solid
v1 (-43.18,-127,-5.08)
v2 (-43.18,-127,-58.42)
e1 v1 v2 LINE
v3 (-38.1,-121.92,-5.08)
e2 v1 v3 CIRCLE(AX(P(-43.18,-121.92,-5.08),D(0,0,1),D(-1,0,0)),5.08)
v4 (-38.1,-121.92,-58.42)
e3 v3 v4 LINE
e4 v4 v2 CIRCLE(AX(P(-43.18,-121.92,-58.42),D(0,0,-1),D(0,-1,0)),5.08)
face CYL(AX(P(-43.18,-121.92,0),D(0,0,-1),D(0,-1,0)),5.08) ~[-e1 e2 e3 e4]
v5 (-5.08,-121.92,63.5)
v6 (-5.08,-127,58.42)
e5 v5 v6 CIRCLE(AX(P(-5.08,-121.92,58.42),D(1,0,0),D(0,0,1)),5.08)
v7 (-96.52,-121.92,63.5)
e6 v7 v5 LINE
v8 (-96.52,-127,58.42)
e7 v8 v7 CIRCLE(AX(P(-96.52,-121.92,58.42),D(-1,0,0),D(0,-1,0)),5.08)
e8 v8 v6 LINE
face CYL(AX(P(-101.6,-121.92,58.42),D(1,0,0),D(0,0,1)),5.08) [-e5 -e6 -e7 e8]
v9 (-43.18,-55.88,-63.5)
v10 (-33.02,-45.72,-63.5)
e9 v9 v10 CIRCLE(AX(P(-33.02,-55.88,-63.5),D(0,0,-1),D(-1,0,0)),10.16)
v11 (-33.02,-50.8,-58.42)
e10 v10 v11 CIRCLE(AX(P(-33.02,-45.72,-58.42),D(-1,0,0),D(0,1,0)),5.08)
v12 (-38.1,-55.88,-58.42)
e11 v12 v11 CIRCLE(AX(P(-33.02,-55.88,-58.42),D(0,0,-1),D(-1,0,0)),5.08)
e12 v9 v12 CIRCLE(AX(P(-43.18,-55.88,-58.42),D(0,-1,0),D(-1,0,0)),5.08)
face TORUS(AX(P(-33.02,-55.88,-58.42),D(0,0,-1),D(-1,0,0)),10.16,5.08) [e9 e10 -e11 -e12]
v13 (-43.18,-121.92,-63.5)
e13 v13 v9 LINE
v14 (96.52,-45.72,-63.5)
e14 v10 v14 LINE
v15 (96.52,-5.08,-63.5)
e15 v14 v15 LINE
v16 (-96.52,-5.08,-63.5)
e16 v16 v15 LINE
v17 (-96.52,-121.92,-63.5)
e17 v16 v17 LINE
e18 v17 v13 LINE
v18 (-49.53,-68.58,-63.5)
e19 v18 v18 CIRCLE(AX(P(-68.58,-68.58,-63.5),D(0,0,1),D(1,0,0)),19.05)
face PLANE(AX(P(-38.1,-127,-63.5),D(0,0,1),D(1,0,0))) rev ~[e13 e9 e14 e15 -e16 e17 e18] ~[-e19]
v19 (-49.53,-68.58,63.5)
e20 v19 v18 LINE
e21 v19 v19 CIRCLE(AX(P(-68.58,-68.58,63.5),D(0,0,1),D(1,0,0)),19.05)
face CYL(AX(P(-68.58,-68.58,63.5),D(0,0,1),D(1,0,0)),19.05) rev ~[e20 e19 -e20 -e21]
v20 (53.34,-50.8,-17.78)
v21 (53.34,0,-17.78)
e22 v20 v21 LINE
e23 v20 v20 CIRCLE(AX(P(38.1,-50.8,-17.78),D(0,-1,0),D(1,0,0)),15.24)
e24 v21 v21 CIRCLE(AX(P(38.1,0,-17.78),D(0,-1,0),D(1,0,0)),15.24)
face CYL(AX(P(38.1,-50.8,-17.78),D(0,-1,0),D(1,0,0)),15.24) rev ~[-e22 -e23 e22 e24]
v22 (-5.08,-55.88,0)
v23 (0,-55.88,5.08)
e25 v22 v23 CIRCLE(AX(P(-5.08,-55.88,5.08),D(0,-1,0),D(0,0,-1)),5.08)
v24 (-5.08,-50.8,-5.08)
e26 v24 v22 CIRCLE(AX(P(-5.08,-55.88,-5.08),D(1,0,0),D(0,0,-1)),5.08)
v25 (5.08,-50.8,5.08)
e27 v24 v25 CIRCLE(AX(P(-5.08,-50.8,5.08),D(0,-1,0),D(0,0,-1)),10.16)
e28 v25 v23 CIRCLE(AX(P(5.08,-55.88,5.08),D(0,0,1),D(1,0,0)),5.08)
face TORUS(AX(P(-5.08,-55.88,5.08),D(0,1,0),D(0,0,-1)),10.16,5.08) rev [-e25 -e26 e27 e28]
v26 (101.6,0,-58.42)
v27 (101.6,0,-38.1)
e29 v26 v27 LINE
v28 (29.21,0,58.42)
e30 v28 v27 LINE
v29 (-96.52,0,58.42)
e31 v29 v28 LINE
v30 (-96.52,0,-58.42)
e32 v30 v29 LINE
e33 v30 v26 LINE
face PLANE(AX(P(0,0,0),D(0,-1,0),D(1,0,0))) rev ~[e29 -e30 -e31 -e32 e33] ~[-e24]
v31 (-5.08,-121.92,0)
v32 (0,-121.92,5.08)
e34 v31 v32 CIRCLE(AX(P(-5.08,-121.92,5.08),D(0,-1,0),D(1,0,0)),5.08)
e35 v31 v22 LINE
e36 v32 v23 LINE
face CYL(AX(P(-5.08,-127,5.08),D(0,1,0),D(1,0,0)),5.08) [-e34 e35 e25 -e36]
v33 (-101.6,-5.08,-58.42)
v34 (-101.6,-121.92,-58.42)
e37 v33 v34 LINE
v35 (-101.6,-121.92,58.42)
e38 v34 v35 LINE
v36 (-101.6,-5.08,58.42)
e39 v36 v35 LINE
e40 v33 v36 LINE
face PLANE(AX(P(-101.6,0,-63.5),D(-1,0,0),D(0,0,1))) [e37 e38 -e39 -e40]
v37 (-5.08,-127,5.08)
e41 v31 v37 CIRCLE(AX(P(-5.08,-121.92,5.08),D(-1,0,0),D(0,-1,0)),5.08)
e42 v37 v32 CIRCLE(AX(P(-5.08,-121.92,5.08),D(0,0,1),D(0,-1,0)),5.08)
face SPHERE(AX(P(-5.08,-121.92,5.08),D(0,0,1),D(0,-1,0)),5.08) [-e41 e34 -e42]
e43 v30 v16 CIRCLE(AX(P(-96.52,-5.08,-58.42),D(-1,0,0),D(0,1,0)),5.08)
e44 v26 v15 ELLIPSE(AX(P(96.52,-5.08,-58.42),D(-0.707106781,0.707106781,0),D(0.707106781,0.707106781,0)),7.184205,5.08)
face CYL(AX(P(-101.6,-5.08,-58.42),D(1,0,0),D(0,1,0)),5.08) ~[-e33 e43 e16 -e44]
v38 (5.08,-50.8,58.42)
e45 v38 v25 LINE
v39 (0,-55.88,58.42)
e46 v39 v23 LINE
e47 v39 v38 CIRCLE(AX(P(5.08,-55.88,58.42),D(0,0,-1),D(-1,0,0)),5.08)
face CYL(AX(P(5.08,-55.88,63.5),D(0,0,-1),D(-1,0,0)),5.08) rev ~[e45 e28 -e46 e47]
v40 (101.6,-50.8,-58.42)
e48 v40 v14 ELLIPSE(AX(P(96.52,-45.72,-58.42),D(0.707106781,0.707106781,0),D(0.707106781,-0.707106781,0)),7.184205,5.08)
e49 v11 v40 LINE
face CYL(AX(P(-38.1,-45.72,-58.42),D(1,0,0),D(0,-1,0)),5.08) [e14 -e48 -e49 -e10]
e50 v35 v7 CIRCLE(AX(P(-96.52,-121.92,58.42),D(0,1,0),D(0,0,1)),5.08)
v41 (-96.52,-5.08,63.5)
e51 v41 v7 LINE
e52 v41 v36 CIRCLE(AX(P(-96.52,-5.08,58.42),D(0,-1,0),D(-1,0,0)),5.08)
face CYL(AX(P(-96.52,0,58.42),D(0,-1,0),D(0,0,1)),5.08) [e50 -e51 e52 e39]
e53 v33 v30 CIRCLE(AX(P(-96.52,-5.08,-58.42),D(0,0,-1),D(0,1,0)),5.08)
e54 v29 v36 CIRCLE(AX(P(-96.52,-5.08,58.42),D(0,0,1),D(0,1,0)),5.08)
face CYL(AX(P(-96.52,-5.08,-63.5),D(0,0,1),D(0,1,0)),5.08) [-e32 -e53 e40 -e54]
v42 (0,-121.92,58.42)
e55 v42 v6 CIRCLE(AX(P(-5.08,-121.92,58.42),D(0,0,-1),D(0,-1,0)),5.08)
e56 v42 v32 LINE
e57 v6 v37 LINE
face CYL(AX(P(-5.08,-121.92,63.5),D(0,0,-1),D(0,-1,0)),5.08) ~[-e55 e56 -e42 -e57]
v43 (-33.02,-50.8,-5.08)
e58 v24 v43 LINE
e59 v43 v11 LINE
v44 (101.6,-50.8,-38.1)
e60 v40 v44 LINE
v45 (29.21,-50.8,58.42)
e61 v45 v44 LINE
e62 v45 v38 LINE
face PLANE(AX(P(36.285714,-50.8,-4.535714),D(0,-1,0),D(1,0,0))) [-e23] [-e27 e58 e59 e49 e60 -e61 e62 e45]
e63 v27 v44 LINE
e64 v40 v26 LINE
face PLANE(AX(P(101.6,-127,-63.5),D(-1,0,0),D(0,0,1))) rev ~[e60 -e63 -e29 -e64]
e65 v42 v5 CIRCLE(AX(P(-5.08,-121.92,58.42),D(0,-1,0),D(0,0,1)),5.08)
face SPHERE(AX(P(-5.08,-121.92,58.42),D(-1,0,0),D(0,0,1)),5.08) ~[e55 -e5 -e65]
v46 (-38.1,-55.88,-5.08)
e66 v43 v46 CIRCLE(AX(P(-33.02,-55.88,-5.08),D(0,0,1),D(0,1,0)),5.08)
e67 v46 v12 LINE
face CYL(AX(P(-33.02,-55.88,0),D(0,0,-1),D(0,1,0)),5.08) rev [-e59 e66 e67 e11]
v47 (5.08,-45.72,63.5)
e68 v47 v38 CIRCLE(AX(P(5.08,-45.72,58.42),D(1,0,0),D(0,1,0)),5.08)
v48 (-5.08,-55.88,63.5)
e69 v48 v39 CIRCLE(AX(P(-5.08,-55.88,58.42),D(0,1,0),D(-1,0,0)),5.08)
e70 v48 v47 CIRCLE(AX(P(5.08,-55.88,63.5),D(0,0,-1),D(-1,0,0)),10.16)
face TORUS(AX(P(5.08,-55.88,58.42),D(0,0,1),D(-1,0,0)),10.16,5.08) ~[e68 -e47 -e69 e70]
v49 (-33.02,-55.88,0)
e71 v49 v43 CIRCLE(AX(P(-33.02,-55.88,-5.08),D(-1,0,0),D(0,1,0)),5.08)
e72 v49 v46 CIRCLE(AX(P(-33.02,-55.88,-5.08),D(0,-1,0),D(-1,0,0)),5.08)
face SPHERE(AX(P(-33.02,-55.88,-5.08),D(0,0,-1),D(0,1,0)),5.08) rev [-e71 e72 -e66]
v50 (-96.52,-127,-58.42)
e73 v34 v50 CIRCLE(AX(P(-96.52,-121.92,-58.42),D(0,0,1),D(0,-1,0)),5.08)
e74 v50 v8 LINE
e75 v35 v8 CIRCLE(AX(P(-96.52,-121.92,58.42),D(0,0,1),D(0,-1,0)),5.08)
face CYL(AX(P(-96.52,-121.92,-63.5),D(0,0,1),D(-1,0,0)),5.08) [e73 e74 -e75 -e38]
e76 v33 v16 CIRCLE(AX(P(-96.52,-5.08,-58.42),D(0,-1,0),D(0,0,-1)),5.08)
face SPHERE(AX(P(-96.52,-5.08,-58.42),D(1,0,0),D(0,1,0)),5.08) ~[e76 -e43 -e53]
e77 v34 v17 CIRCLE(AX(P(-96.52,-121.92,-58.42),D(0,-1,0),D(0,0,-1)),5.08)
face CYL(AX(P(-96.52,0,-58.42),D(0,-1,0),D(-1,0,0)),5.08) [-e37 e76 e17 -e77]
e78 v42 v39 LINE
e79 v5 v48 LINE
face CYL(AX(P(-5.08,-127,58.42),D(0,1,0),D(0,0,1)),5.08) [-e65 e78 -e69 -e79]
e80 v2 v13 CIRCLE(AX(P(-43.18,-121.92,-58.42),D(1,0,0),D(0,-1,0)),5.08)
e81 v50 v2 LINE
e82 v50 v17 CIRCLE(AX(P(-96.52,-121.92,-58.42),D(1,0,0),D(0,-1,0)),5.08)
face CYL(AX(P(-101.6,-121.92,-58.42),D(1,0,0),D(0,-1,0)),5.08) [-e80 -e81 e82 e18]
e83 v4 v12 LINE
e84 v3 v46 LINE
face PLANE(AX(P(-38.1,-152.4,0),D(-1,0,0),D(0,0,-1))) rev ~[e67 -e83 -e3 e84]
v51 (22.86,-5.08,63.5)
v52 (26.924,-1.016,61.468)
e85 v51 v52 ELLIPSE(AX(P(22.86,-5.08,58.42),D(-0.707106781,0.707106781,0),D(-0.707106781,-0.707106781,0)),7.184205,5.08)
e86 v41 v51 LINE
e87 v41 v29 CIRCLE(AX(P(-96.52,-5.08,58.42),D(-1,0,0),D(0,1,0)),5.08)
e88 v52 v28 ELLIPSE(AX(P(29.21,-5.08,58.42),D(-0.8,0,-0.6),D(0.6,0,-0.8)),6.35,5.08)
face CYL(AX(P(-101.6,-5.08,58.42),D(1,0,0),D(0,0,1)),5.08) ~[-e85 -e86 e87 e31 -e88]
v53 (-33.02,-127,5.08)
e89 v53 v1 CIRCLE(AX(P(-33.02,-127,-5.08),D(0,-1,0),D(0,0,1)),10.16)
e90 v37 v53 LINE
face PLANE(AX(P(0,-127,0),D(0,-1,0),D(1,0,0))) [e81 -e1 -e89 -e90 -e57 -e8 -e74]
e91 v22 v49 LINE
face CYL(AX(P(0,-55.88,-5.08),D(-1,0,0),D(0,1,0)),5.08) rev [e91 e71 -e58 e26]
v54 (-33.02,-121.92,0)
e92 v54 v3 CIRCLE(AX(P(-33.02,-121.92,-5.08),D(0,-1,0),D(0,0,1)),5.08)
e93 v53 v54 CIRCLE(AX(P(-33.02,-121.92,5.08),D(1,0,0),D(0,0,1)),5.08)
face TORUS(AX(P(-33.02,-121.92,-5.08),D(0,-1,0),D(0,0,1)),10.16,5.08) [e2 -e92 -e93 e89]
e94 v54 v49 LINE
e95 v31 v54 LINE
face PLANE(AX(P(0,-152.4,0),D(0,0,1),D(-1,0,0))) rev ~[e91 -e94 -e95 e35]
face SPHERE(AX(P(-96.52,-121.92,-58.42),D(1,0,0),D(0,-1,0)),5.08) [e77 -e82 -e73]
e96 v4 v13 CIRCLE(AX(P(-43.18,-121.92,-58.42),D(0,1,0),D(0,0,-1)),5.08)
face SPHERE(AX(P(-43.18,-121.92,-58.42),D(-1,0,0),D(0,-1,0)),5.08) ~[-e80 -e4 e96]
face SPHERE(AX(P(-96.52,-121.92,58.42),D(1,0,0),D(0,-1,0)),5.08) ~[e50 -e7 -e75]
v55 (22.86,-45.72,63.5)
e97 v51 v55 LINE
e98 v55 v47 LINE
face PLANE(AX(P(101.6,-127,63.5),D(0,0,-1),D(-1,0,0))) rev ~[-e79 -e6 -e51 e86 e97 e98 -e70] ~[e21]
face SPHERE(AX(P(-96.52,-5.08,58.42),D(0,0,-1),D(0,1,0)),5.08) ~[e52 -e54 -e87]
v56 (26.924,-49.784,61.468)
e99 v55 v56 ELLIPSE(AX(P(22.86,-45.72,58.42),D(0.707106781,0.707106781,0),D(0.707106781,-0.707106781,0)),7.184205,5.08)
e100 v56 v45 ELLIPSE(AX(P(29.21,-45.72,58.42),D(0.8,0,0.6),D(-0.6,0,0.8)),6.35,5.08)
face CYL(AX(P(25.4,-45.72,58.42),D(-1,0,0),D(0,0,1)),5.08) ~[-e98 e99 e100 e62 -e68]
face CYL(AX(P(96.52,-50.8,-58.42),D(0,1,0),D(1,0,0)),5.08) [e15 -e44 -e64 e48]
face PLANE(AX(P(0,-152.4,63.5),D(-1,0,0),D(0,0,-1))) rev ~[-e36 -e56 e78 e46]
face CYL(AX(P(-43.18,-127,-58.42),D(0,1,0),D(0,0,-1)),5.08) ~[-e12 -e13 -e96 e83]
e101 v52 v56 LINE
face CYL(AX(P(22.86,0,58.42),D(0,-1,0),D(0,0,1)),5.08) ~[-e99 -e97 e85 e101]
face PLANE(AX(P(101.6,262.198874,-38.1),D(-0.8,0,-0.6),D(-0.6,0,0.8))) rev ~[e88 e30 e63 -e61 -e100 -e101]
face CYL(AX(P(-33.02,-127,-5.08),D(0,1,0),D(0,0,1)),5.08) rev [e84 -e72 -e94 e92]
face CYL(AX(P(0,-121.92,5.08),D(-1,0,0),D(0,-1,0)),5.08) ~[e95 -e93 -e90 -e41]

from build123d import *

# Parameters (mm, degrees)
F0_W        = 203.2
F0_H        = 127
F1_DEPTH    = 127
F3_DEPTH    = 25.4
F4_DEPTH    = 101.6
F5_T1_DEPTH = 575.1977482789
F6_R        = 5.08
F7_R        = 15.24
F8_DEPTH    = 50.8
F9_R        = 19.05
F10_DEPTH   = 127


# Not quite as in the source:
# - a fillet or chamfer that OpenCascade refuses, or shapes differently, is made with other operations: its cross-section is extruded or revolved along the edge and cut away or added


with BuildPart() as f1:
    # F0 (on Front) → F1 (new body)
    with BuildSketch(Plane.XZ):
        Rectangle(F0_W, F0_H)
    extrude(amount=F1_DEPTH)

    # F2 (on face) → F3 (join)
    with BuildSketch(Plane.XZ.offset(127)):
        Polygon((101.6, 63.5), (0, 63.5), (0, 0), (-38.1, 0), (-38.1, -63.5), (101.6, -63.5), align=None)
    extrude(amount=F3_DEPTH)

    # F4 (cut): a face of the model
    f4_faces = [f1.faces().sort_by_distance(p)[0] for p in [
        (39.7710526316, -152.4, -5.0131578947),
    ]]
    extrude(f4_faces, amount=-F4_DEPTH, mode=Mode.SUBTRACT)

    # F5: chamfer of 76.2 x 101.6 on 1 edges, made by hand

    # F5_s2 → F5_t1 (cut)
    with BuildSketch(Plane.XZ.offset(-262.1988741395)):
        Polygon((101.6, -38.1), (25.4, 63.5), (101.6, 63.5), align=None)
    extrude(amount=F5_T1_DEPTH, mode=Mode.SUBTRACT)

    # F6
    f6_edges = [f1.edges().sort_by_distance(p)[0] for p in [
        (-50.8, -127, 63.5),
        (0, -88.9, 63.5),
        (0, -127, 31.75),
        (-19.05, -127, 0),
        (-69.85, -127, -63.5),
        (-101.6, -127, 0),
        (-38.1, -127, -31.75),
        (-38.1, -88.9, -63.5),
        (31.75, -50.8, -63.5),
        (-38.1, -50.8, -31.75),
        (101.6, -25.4, -63.5),
        (0, 0, -63.5),
        (-101.6, 0, 0),
        (-101.6, -63.5, -63.5),
        (12.7, -50.8, 63.5),
        (25.4, -25.4, 63.5),
        (-38.1, 0, 63.5),
        (0, -88.9, 0),
        (-19.05, -50.8, 0),
        (-38.1, -88.9, 0),
        (-101.6, -63.5, 63.5),
        (0, -50.8, 31.75),
    ]]
    fillet(f6_edges, radius=F6_R)

    # F7 (on face) → F8 (cut, through all)
    with BuildSketch(Plane.XZ.offset(50.8)):
        with Locations((38.1, -17.78)):
            Circle(F7_R)
    extrude(amount=-F8_DEPTH, mode=Mode.SUBTRACT)

    # F9 (on face) → F10 (cut, through all)
    with BuildSketch(Plane.XY.offset(63.5)):
        with Locations((-68.58, -68.58)):
            Circle(F9_R)
    extrude(amount=-F10_DEPTH, mode=Mode.SUBTRACT)


solid = f1.part
